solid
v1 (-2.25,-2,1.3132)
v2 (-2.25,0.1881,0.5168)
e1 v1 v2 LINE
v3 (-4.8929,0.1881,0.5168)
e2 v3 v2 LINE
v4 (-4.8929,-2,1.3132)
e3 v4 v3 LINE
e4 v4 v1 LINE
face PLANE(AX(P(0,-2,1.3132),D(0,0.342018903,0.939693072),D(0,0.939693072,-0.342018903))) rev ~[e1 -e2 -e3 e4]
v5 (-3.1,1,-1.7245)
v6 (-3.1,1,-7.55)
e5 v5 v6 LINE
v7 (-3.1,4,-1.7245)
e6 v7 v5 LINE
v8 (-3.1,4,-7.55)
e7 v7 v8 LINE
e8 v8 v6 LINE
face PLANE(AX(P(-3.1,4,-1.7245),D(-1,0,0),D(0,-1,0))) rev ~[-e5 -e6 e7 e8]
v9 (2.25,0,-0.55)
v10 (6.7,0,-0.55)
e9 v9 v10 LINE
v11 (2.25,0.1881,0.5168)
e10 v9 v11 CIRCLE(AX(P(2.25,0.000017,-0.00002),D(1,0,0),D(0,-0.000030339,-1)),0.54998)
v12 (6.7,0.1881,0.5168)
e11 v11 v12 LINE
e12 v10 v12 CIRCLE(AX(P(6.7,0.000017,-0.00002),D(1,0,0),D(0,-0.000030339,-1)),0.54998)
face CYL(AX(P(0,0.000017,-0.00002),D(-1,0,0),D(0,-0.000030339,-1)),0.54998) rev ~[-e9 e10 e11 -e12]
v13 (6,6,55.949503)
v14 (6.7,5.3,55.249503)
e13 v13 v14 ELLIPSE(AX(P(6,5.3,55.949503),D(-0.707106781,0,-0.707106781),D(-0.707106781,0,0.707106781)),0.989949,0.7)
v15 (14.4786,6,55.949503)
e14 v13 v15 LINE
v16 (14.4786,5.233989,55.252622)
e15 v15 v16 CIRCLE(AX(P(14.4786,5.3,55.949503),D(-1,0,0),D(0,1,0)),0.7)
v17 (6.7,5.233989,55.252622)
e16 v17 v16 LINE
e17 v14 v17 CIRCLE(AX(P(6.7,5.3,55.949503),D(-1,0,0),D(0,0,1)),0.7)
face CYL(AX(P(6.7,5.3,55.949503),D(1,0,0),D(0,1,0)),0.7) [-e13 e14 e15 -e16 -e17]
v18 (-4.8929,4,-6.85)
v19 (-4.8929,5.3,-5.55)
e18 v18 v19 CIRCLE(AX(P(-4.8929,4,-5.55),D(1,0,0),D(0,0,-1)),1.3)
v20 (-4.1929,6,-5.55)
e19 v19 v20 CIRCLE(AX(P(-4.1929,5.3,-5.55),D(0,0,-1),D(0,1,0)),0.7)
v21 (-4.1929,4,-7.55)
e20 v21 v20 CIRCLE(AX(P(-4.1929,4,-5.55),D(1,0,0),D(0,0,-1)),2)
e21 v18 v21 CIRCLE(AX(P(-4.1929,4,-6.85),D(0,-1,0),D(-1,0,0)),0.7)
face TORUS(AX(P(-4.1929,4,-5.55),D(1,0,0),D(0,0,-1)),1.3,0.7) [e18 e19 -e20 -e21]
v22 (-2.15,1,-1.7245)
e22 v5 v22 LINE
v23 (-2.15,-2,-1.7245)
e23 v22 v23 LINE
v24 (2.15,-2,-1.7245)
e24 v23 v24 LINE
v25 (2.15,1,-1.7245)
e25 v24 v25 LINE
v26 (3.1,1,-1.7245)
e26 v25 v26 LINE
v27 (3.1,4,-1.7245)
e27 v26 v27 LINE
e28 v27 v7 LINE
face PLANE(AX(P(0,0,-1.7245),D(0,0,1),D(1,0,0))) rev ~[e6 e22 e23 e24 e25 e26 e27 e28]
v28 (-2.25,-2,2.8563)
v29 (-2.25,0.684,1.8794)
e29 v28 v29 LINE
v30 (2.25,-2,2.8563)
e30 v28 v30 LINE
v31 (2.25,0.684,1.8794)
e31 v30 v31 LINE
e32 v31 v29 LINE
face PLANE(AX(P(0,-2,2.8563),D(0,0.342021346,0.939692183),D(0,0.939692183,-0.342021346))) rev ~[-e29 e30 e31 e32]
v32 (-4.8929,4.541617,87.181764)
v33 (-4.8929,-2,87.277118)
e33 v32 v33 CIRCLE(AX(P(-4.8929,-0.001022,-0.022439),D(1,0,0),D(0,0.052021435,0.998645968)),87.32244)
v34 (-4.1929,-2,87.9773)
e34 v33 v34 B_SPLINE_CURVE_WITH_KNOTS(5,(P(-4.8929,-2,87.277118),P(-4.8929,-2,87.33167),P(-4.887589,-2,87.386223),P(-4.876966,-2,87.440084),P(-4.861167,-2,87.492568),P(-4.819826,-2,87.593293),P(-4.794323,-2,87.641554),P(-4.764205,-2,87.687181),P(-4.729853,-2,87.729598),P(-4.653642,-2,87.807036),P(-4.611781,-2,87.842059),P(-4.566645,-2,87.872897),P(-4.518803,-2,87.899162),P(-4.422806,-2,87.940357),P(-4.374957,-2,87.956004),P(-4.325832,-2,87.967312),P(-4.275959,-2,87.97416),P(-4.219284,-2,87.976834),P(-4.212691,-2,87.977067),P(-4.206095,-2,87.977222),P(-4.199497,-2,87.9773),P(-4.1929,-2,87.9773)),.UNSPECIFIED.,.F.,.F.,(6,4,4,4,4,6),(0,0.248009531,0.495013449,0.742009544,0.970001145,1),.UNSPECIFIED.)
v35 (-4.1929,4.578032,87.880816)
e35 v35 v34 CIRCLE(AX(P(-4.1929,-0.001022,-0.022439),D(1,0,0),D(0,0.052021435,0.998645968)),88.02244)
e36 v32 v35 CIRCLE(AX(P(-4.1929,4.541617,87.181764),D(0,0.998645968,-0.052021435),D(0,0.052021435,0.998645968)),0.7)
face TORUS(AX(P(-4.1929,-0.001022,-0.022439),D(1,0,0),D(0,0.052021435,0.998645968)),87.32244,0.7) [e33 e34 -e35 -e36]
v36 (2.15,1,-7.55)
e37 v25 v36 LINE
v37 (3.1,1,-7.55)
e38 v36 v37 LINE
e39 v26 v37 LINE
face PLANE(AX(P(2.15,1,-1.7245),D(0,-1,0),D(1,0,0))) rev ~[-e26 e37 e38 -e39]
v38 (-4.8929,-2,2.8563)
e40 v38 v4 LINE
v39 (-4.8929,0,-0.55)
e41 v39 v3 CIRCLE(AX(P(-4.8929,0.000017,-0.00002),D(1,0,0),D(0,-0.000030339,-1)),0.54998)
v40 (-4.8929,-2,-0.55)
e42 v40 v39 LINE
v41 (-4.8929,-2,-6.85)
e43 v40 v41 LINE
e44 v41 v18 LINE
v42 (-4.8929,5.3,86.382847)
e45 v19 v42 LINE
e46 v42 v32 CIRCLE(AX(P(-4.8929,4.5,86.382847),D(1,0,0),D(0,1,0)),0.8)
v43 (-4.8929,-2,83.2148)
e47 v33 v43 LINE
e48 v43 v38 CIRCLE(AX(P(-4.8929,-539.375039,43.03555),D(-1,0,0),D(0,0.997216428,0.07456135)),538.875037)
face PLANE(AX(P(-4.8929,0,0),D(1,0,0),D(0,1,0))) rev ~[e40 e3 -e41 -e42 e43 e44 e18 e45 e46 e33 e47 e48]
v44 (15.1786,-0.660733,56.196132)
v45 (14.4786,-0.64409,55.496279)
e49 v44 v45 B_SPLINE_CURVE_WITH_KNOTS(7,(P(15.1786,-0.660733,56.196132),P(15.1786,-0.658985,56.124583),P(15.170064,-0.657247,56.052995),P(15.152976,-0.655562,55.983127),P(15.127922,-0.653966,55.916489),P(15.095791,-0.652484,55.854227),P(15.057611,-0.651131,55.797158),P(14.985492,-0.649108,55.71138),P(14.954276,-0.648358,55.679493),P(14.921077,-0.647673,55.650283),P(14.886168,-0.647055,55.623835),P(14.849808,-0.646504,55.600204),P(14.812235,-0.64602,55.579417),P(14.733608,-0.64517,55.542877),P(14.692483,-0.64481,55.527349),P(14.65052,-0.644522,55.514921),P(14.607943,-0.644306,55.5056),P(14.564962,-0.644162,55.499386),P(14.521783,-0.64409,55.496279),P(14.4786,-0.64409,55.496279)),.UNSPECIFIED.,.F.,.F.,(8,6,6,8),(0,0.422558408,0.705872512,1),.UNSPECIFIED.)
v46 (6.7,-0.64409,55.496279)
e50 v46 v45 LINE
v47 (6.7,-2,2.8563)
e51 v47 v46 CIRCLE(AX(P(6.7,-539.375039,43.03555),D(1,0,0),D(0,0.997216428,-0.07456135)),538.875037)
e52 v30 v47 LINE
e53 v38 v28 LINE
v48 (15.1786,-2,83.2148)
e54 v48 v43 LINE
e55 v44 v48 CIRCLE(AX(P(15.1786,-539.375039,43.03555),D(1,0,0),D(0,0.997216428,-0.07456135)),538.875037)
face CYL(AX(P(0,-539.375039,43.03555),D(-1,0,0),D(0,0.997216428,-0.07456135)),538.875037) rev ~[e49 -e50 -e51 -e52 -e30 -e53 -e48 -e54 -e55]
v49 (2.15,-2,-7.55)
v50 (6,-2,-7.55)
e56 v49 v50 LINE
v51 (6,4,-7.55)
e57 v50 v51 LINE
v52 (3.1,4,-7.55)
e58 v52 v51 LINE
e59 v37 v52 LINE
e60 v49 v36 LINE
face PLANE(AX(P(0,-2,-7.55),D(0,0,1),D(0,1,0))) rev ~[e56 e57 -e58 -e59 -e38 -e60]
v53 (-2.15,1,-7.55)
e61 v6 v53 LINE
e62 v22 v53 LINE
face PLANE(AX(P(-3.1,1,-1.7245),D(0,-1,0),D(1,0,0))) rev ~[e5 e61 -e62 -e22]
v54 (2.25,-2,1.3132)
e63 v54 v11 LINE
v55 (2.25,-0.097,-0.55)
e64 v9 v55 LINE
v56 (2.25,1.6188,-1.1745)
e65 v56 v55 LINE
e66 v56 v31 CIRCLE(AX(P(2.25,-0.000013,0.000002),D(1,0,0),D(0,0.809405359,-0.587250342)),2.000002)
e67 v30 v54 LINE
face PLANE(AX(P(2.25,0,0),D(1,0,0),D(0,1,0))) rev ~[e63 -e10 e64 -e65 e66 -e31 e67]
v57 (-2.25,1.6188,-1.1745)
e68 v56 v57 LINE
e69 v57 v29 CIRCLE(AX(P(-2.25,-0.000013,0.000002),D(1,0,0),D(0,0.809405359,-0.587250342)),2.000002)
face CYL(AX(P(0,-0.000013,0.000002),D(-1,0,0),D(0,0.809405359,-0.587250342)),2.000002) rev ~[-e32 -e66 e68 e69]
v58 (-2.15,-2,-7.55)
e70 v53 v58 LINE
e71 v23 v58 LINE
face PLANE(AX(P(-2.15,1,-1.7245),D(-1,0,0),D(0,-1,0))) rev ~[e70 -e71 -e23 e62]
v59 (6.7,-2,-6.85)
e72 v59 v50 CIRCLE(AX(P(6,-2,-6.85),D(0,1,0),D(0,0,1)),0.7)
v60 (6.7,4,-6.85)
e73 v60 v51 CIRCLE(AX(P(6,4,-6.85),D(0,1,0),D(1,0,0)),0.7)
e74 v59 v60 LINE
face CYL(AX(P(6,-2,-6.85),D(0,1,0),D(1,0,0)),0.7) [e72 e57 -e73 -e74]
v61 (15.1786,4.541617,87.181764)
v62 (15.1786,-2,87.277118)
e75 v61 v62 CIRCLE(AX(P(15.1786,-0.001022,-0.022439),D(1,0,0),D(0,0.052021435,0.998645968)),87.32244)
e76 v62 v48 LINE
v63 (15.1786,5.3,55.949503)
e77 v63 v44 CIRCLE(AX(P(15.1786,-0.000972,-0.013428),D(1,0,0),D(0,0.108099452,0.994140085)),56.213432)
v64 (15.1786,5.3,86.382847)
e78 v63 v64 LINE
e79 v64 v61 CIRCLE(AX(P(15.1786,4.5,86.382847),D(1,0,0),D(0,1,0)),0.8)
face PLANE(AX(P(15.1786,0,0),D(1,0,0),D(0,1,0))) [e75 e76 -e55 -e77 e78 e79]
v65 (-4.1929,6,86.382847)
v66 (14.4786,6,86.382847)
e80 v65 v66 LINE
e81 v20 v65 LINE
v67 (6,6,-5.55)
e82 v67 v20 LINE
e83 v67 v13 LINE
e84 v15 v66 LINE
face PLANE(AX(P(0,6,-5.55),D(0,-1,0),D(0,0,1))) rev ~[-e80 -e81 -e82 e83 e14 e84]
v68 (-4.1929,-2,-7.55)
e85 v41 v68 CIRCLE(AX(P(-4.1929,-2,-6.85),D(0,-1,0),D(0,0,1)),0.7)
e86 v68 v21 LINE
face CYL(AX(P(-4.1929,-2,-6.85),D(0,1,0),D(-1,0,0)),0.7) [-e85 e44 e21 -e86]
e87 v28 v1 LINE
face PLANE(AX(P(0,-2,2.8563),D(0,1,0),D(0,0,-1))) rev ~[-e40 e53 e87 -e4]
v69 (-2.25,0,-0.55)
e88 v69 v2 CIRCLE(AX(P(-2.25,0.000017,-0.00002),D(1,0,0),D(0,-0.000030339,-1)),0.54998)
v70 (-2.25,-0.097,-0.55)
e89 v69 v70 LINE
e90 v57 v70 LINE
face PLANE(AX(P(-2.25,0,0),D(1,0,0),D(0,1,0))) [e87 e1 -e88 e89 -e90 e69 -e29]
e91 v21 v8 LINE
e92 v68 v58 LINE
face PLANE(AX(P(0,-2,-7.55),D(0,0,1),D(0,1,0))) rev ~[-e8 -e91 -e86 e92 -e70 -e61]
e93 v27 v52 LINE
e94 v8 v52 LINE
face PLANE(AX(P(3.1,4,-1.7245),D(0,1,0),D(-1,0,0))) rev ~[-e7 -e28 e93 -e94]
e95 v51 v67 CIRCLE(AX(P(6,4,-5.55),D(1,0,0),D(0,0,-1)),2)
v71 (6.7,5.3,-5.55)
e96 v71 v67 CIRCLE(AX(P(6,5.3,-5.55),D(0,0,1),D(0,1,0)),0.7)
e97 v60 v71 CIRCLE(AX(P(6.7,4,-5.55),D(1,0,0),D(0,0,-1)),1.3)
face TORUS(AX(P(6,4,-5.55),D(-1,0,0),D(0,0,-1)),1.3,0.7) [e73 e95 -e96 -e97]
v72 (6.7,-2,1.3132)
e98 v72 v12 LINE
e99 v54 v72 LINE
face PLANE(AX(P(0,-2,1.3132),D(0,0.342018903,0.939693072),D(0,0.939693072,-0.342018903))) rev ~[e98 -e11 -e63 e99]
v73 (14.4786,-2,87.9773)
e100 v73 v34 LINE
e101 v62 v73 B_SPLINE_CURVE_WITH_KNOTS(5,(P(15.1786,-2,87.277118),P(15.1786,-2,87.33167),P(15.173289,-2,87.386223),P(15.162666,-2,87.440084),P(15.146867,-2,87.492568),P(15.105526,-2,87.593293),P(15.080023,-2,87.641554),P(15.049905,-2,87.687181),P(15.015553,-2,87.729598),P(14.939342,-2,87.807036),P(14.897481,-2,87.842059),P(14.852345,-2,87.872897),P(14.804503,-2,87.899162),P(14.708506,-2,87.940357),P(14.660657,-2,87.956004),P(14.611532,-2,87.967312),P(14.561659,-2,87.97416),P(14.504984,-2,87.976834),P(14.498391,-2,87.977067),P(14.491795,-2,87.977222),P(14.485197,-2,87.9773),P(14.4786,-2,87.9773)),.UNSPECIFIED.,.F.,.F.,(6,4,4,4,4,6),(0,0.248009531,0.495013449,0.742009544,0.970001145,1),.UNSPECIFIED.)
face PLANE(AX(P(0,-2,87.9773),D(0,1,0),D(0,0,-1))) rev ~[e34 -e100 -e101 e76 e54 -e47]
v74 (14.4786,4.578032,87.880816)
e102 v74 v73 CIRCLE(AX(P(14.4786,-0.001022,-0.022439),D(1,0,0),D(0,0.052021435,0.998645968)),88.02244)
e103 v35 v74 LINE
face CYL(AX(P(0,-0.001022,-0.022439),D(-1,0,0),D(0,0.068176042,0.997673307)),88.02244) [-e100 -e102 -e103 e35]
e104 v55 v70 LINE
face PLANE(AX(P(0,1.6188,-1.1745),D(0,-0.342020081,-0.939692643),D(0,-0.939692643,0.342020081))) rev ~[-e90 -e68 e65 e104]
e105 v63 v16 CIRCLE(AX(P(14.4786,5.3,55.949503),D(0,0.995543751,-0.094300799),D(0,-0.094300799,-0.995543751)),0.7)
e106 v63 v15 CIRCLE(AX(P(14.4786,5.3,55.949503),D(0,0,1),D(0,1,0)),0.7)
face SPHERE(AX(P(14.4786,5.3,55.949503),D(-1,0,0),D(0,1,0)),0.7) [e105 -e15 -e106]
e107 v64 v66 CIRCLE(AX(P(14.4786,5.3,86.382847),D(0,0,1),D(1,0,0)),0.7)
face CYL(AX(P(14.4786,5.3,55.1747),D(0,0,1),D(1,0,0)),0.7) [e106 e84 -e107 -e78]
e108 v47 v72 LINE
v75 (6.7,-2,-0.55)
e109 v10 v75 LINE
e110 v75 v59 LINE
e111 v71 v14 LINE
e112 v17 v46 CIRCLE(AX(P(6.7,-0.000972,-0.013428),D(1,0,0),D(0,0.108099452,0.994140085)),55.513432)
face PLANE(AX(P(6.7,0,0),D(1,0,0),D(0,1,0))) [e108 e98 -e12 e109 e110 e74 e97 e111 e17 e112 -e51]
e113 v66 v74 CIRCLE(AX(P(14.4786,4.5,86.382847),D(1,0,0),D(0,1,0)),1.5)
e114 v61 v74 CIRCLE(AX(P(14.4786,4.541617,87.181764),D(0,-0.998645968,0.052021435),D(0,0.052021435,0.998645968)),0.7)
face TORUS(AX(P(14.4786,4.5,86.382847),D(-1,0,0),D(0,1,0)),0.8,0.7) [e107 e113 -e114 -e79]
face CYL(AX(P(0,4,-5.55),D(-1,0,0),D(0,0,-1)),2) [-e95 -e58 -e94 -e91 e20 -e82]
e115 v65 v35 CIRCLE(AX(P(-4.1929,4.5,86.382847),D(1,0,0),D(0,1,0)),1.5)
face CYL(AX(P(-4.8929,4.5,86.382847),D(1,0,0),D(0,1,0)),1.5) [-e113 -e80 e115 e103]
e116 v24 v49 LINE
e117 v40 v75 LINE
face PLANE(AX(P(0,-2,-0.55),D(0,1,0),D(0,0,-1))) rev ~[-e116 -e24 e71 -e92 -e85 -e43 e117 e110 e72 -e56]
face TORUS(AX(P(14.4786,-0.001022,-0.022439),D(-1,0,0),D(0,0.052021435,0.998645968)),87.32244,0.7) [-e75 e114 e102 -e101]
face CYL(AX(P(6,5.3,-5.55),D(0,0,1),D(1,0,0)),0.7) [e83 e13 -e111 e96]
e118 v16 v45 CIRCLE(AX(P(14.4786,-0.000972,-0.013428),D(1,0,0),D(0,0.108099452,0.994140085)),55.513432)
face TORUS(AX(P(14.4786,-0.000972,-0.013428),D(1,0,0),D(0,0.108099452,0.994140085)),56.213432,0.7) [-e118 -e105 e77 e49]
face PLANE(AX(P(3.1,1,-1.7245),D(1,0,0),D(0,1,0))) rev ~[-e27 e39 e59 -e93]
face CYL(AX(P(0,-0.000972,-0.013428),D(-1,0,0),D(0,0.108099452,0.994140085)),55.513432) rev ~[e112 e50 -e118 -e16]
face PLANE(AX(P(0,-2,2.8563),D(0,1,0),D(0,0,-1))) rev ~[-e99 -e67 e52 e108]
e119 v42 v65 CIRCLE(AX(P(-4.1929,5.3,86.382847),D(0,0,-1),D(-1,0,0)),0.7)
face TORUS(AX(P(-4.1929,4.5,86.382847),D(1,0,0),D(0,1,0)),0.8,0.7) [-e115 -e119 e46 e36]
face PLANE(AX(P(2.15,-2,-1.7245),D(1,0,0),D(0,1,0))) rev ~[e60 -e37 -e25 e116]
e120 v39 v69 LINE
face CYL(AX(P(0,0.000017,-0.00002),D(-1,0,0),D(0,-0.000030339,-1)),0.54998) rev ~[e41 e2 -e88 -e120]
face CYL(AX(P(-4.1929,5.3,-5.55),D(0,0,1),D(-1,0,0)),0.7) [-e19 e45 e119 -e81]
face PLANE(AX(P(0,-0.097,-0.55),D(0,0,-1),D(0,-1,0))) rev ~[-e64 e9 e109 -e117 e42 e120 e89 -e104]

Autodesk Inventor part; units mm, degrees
ref_plane "YZ Plane" through (0, 0, 0) normal (1, 0, 0) x (0, 1, 0)
ref_plane "XZ Plane" through (0, 0, 0) normal (0, 1, 0) x (-1, 0, 0)
ref_plane "Slot Start Plane" through (0, 0, -1.7245) normal (0, 0, 1) x (1, 0, 0)
sketch "Key Profile" plane through (0, 0, 0) normal (1, 0, 0) x (0, 1, 0)
  line L0 (-2, 2.8563) -> (0.684, 1.8794)
  arc A0 (1.6188, -1.1745) -> (0.684, 1.8794) centre (0, 0) ccw
  line L1 (-2, 1.3132) -> (0.1881, 0.5168)
  arc A1 (0, -0.55) -> (0.1881, 0.5168) centre (0, 0) ccw
  line L2 (-2, 2.8563) -> (-2, -0.55)
  line L3 (0, 0) -> (-2, 0) construction
  line L4 (0, -0.55) -> (-2, -0.55)
  line L5 (1.6188, -1.1745) -> (-0.097, -0.55)
  line L6 (6, -5.55) -> (6, 87.7952)
  line L7 (-2, 87.9773) -> (-2, 2.8563)
  arc A2 (6, 87.7952) -> (-2, 87.9773) centre (0, 0) ccw
  line L8 (-2, -0.55) -> (-2, -7.55)
  arc A3 (4, -7.55) -> (6, -5.55) centre (4, -5.55) ccw
  line L9 (-2, -7.55) -> (4, -7.55)
  arc A4 (6, 55.1747) -> (-2, 55.464) centre (0, 0) ccw
  arc A5 (-2, 2.8563) -> (-2, 83.2148) centre (-539.3737, 43.0355) ccw
  point P0 (-0.5, 43.0355)
  point P1 (-0.6441, 55.4963)
  dimension "my_hingeCutRad" = 0.55
  dimension "my_hingeDepth" = 2
  dimension "my_hingeRegCutRad" = 2
  dimension "keyLength" = 88
  dimension "my_KeyHeight" = 8
  dimension "d107" = 20
  dimension "d122" = 4
  dimension "slotOffset" = 1.1745
  dimension "my_backWidth" = 7
  dimension "d128" = 55.5
  dimension "d135" = 1.5
  dimension "d136" = 4.7625
extrude "Upper (u)" add sketch "Key Profile" along normal blind 6.7 and the other way blind 4.8929 contours A5 A4 L6 A3 L9 L8 L4 L5 A0 L0 | L0 A0 L5 L4 A1 L1 L2
extrude "Lower (d)" add sketch "Key Profile" along normal blind 15.1786 and the other way blind 4.8929 contours A5 L7 A2 L6 A4
extrude "Protrusion Cutout" cut sketch "Key Profile" along normal mid plane 4.5 contours L0 A0 L5 L4 A1 L1 L2
fillet "Front Fillet" radius 1.5 1 edges at (5.1429, 6, 87.7952)
sketch "Slot Sketch" plane through (0, 0, -1.7245) normal (0, 0, 1) x (1, 0, 0)
  line L0 (2.15, -2) -> (2.15, 1)
  line L1 (3.1, 4) -> (-3.1, 4)
  line L2 (-2.15, 1) -> (-2.15, -2)
  line L3 (-2.15, -2) -> (2.15, -2)
  line L4 (0, -2) -> (0, 4) construction
  line L5 (-3.1, 4) -> (-3.1, 1)
  line L6 (-3.1, 1) -> (-2.15, 1)
  line L7 (2.15, 1) -> (3.1, 1)
  line L8 (3.1, 1) -> (3.1, 4)
  point P0 (0, 0)
  dimension "d109" = 2
  dimension "my_slotHeadOffset" = 1
  dimension "my_slotHeadHeight" = 3
  dimension "my_slotHeadWidth" = 6.2
  dimension "my_neckSlotWidth" = 4.3
extrude "Slot" cut sketch "Slot Sketch" against normal through all
fillet "Edge Softening" radius 0.7 13 edges at (6.7, 5.4142, -6.9642) (6.7, 1, -7.55) (6.7, 6, 24.8124) (-4.8929, 5.4142, -6.9642) (-4.8929, 1, -7.55) (-4.8929, 6, 40.4164) (-4.8929, 5.5879, 87.4156) (-4.8929, 1.2899, 87.9905) (15.1786, 5.5879, 87.4156) (15.1786, 1.2899, 87.9905) (15.1786, 6, 70.7788) (15.1786, 2.6828, 55.4351) (10.9393, 6, 55.1747)
equation "\"my_headHeight\" = 3"
equation "\"my_headOffset\" = 1"
equation "\"whiteKeyWidth\" = 20.07143"
properties part number "FKey0"
